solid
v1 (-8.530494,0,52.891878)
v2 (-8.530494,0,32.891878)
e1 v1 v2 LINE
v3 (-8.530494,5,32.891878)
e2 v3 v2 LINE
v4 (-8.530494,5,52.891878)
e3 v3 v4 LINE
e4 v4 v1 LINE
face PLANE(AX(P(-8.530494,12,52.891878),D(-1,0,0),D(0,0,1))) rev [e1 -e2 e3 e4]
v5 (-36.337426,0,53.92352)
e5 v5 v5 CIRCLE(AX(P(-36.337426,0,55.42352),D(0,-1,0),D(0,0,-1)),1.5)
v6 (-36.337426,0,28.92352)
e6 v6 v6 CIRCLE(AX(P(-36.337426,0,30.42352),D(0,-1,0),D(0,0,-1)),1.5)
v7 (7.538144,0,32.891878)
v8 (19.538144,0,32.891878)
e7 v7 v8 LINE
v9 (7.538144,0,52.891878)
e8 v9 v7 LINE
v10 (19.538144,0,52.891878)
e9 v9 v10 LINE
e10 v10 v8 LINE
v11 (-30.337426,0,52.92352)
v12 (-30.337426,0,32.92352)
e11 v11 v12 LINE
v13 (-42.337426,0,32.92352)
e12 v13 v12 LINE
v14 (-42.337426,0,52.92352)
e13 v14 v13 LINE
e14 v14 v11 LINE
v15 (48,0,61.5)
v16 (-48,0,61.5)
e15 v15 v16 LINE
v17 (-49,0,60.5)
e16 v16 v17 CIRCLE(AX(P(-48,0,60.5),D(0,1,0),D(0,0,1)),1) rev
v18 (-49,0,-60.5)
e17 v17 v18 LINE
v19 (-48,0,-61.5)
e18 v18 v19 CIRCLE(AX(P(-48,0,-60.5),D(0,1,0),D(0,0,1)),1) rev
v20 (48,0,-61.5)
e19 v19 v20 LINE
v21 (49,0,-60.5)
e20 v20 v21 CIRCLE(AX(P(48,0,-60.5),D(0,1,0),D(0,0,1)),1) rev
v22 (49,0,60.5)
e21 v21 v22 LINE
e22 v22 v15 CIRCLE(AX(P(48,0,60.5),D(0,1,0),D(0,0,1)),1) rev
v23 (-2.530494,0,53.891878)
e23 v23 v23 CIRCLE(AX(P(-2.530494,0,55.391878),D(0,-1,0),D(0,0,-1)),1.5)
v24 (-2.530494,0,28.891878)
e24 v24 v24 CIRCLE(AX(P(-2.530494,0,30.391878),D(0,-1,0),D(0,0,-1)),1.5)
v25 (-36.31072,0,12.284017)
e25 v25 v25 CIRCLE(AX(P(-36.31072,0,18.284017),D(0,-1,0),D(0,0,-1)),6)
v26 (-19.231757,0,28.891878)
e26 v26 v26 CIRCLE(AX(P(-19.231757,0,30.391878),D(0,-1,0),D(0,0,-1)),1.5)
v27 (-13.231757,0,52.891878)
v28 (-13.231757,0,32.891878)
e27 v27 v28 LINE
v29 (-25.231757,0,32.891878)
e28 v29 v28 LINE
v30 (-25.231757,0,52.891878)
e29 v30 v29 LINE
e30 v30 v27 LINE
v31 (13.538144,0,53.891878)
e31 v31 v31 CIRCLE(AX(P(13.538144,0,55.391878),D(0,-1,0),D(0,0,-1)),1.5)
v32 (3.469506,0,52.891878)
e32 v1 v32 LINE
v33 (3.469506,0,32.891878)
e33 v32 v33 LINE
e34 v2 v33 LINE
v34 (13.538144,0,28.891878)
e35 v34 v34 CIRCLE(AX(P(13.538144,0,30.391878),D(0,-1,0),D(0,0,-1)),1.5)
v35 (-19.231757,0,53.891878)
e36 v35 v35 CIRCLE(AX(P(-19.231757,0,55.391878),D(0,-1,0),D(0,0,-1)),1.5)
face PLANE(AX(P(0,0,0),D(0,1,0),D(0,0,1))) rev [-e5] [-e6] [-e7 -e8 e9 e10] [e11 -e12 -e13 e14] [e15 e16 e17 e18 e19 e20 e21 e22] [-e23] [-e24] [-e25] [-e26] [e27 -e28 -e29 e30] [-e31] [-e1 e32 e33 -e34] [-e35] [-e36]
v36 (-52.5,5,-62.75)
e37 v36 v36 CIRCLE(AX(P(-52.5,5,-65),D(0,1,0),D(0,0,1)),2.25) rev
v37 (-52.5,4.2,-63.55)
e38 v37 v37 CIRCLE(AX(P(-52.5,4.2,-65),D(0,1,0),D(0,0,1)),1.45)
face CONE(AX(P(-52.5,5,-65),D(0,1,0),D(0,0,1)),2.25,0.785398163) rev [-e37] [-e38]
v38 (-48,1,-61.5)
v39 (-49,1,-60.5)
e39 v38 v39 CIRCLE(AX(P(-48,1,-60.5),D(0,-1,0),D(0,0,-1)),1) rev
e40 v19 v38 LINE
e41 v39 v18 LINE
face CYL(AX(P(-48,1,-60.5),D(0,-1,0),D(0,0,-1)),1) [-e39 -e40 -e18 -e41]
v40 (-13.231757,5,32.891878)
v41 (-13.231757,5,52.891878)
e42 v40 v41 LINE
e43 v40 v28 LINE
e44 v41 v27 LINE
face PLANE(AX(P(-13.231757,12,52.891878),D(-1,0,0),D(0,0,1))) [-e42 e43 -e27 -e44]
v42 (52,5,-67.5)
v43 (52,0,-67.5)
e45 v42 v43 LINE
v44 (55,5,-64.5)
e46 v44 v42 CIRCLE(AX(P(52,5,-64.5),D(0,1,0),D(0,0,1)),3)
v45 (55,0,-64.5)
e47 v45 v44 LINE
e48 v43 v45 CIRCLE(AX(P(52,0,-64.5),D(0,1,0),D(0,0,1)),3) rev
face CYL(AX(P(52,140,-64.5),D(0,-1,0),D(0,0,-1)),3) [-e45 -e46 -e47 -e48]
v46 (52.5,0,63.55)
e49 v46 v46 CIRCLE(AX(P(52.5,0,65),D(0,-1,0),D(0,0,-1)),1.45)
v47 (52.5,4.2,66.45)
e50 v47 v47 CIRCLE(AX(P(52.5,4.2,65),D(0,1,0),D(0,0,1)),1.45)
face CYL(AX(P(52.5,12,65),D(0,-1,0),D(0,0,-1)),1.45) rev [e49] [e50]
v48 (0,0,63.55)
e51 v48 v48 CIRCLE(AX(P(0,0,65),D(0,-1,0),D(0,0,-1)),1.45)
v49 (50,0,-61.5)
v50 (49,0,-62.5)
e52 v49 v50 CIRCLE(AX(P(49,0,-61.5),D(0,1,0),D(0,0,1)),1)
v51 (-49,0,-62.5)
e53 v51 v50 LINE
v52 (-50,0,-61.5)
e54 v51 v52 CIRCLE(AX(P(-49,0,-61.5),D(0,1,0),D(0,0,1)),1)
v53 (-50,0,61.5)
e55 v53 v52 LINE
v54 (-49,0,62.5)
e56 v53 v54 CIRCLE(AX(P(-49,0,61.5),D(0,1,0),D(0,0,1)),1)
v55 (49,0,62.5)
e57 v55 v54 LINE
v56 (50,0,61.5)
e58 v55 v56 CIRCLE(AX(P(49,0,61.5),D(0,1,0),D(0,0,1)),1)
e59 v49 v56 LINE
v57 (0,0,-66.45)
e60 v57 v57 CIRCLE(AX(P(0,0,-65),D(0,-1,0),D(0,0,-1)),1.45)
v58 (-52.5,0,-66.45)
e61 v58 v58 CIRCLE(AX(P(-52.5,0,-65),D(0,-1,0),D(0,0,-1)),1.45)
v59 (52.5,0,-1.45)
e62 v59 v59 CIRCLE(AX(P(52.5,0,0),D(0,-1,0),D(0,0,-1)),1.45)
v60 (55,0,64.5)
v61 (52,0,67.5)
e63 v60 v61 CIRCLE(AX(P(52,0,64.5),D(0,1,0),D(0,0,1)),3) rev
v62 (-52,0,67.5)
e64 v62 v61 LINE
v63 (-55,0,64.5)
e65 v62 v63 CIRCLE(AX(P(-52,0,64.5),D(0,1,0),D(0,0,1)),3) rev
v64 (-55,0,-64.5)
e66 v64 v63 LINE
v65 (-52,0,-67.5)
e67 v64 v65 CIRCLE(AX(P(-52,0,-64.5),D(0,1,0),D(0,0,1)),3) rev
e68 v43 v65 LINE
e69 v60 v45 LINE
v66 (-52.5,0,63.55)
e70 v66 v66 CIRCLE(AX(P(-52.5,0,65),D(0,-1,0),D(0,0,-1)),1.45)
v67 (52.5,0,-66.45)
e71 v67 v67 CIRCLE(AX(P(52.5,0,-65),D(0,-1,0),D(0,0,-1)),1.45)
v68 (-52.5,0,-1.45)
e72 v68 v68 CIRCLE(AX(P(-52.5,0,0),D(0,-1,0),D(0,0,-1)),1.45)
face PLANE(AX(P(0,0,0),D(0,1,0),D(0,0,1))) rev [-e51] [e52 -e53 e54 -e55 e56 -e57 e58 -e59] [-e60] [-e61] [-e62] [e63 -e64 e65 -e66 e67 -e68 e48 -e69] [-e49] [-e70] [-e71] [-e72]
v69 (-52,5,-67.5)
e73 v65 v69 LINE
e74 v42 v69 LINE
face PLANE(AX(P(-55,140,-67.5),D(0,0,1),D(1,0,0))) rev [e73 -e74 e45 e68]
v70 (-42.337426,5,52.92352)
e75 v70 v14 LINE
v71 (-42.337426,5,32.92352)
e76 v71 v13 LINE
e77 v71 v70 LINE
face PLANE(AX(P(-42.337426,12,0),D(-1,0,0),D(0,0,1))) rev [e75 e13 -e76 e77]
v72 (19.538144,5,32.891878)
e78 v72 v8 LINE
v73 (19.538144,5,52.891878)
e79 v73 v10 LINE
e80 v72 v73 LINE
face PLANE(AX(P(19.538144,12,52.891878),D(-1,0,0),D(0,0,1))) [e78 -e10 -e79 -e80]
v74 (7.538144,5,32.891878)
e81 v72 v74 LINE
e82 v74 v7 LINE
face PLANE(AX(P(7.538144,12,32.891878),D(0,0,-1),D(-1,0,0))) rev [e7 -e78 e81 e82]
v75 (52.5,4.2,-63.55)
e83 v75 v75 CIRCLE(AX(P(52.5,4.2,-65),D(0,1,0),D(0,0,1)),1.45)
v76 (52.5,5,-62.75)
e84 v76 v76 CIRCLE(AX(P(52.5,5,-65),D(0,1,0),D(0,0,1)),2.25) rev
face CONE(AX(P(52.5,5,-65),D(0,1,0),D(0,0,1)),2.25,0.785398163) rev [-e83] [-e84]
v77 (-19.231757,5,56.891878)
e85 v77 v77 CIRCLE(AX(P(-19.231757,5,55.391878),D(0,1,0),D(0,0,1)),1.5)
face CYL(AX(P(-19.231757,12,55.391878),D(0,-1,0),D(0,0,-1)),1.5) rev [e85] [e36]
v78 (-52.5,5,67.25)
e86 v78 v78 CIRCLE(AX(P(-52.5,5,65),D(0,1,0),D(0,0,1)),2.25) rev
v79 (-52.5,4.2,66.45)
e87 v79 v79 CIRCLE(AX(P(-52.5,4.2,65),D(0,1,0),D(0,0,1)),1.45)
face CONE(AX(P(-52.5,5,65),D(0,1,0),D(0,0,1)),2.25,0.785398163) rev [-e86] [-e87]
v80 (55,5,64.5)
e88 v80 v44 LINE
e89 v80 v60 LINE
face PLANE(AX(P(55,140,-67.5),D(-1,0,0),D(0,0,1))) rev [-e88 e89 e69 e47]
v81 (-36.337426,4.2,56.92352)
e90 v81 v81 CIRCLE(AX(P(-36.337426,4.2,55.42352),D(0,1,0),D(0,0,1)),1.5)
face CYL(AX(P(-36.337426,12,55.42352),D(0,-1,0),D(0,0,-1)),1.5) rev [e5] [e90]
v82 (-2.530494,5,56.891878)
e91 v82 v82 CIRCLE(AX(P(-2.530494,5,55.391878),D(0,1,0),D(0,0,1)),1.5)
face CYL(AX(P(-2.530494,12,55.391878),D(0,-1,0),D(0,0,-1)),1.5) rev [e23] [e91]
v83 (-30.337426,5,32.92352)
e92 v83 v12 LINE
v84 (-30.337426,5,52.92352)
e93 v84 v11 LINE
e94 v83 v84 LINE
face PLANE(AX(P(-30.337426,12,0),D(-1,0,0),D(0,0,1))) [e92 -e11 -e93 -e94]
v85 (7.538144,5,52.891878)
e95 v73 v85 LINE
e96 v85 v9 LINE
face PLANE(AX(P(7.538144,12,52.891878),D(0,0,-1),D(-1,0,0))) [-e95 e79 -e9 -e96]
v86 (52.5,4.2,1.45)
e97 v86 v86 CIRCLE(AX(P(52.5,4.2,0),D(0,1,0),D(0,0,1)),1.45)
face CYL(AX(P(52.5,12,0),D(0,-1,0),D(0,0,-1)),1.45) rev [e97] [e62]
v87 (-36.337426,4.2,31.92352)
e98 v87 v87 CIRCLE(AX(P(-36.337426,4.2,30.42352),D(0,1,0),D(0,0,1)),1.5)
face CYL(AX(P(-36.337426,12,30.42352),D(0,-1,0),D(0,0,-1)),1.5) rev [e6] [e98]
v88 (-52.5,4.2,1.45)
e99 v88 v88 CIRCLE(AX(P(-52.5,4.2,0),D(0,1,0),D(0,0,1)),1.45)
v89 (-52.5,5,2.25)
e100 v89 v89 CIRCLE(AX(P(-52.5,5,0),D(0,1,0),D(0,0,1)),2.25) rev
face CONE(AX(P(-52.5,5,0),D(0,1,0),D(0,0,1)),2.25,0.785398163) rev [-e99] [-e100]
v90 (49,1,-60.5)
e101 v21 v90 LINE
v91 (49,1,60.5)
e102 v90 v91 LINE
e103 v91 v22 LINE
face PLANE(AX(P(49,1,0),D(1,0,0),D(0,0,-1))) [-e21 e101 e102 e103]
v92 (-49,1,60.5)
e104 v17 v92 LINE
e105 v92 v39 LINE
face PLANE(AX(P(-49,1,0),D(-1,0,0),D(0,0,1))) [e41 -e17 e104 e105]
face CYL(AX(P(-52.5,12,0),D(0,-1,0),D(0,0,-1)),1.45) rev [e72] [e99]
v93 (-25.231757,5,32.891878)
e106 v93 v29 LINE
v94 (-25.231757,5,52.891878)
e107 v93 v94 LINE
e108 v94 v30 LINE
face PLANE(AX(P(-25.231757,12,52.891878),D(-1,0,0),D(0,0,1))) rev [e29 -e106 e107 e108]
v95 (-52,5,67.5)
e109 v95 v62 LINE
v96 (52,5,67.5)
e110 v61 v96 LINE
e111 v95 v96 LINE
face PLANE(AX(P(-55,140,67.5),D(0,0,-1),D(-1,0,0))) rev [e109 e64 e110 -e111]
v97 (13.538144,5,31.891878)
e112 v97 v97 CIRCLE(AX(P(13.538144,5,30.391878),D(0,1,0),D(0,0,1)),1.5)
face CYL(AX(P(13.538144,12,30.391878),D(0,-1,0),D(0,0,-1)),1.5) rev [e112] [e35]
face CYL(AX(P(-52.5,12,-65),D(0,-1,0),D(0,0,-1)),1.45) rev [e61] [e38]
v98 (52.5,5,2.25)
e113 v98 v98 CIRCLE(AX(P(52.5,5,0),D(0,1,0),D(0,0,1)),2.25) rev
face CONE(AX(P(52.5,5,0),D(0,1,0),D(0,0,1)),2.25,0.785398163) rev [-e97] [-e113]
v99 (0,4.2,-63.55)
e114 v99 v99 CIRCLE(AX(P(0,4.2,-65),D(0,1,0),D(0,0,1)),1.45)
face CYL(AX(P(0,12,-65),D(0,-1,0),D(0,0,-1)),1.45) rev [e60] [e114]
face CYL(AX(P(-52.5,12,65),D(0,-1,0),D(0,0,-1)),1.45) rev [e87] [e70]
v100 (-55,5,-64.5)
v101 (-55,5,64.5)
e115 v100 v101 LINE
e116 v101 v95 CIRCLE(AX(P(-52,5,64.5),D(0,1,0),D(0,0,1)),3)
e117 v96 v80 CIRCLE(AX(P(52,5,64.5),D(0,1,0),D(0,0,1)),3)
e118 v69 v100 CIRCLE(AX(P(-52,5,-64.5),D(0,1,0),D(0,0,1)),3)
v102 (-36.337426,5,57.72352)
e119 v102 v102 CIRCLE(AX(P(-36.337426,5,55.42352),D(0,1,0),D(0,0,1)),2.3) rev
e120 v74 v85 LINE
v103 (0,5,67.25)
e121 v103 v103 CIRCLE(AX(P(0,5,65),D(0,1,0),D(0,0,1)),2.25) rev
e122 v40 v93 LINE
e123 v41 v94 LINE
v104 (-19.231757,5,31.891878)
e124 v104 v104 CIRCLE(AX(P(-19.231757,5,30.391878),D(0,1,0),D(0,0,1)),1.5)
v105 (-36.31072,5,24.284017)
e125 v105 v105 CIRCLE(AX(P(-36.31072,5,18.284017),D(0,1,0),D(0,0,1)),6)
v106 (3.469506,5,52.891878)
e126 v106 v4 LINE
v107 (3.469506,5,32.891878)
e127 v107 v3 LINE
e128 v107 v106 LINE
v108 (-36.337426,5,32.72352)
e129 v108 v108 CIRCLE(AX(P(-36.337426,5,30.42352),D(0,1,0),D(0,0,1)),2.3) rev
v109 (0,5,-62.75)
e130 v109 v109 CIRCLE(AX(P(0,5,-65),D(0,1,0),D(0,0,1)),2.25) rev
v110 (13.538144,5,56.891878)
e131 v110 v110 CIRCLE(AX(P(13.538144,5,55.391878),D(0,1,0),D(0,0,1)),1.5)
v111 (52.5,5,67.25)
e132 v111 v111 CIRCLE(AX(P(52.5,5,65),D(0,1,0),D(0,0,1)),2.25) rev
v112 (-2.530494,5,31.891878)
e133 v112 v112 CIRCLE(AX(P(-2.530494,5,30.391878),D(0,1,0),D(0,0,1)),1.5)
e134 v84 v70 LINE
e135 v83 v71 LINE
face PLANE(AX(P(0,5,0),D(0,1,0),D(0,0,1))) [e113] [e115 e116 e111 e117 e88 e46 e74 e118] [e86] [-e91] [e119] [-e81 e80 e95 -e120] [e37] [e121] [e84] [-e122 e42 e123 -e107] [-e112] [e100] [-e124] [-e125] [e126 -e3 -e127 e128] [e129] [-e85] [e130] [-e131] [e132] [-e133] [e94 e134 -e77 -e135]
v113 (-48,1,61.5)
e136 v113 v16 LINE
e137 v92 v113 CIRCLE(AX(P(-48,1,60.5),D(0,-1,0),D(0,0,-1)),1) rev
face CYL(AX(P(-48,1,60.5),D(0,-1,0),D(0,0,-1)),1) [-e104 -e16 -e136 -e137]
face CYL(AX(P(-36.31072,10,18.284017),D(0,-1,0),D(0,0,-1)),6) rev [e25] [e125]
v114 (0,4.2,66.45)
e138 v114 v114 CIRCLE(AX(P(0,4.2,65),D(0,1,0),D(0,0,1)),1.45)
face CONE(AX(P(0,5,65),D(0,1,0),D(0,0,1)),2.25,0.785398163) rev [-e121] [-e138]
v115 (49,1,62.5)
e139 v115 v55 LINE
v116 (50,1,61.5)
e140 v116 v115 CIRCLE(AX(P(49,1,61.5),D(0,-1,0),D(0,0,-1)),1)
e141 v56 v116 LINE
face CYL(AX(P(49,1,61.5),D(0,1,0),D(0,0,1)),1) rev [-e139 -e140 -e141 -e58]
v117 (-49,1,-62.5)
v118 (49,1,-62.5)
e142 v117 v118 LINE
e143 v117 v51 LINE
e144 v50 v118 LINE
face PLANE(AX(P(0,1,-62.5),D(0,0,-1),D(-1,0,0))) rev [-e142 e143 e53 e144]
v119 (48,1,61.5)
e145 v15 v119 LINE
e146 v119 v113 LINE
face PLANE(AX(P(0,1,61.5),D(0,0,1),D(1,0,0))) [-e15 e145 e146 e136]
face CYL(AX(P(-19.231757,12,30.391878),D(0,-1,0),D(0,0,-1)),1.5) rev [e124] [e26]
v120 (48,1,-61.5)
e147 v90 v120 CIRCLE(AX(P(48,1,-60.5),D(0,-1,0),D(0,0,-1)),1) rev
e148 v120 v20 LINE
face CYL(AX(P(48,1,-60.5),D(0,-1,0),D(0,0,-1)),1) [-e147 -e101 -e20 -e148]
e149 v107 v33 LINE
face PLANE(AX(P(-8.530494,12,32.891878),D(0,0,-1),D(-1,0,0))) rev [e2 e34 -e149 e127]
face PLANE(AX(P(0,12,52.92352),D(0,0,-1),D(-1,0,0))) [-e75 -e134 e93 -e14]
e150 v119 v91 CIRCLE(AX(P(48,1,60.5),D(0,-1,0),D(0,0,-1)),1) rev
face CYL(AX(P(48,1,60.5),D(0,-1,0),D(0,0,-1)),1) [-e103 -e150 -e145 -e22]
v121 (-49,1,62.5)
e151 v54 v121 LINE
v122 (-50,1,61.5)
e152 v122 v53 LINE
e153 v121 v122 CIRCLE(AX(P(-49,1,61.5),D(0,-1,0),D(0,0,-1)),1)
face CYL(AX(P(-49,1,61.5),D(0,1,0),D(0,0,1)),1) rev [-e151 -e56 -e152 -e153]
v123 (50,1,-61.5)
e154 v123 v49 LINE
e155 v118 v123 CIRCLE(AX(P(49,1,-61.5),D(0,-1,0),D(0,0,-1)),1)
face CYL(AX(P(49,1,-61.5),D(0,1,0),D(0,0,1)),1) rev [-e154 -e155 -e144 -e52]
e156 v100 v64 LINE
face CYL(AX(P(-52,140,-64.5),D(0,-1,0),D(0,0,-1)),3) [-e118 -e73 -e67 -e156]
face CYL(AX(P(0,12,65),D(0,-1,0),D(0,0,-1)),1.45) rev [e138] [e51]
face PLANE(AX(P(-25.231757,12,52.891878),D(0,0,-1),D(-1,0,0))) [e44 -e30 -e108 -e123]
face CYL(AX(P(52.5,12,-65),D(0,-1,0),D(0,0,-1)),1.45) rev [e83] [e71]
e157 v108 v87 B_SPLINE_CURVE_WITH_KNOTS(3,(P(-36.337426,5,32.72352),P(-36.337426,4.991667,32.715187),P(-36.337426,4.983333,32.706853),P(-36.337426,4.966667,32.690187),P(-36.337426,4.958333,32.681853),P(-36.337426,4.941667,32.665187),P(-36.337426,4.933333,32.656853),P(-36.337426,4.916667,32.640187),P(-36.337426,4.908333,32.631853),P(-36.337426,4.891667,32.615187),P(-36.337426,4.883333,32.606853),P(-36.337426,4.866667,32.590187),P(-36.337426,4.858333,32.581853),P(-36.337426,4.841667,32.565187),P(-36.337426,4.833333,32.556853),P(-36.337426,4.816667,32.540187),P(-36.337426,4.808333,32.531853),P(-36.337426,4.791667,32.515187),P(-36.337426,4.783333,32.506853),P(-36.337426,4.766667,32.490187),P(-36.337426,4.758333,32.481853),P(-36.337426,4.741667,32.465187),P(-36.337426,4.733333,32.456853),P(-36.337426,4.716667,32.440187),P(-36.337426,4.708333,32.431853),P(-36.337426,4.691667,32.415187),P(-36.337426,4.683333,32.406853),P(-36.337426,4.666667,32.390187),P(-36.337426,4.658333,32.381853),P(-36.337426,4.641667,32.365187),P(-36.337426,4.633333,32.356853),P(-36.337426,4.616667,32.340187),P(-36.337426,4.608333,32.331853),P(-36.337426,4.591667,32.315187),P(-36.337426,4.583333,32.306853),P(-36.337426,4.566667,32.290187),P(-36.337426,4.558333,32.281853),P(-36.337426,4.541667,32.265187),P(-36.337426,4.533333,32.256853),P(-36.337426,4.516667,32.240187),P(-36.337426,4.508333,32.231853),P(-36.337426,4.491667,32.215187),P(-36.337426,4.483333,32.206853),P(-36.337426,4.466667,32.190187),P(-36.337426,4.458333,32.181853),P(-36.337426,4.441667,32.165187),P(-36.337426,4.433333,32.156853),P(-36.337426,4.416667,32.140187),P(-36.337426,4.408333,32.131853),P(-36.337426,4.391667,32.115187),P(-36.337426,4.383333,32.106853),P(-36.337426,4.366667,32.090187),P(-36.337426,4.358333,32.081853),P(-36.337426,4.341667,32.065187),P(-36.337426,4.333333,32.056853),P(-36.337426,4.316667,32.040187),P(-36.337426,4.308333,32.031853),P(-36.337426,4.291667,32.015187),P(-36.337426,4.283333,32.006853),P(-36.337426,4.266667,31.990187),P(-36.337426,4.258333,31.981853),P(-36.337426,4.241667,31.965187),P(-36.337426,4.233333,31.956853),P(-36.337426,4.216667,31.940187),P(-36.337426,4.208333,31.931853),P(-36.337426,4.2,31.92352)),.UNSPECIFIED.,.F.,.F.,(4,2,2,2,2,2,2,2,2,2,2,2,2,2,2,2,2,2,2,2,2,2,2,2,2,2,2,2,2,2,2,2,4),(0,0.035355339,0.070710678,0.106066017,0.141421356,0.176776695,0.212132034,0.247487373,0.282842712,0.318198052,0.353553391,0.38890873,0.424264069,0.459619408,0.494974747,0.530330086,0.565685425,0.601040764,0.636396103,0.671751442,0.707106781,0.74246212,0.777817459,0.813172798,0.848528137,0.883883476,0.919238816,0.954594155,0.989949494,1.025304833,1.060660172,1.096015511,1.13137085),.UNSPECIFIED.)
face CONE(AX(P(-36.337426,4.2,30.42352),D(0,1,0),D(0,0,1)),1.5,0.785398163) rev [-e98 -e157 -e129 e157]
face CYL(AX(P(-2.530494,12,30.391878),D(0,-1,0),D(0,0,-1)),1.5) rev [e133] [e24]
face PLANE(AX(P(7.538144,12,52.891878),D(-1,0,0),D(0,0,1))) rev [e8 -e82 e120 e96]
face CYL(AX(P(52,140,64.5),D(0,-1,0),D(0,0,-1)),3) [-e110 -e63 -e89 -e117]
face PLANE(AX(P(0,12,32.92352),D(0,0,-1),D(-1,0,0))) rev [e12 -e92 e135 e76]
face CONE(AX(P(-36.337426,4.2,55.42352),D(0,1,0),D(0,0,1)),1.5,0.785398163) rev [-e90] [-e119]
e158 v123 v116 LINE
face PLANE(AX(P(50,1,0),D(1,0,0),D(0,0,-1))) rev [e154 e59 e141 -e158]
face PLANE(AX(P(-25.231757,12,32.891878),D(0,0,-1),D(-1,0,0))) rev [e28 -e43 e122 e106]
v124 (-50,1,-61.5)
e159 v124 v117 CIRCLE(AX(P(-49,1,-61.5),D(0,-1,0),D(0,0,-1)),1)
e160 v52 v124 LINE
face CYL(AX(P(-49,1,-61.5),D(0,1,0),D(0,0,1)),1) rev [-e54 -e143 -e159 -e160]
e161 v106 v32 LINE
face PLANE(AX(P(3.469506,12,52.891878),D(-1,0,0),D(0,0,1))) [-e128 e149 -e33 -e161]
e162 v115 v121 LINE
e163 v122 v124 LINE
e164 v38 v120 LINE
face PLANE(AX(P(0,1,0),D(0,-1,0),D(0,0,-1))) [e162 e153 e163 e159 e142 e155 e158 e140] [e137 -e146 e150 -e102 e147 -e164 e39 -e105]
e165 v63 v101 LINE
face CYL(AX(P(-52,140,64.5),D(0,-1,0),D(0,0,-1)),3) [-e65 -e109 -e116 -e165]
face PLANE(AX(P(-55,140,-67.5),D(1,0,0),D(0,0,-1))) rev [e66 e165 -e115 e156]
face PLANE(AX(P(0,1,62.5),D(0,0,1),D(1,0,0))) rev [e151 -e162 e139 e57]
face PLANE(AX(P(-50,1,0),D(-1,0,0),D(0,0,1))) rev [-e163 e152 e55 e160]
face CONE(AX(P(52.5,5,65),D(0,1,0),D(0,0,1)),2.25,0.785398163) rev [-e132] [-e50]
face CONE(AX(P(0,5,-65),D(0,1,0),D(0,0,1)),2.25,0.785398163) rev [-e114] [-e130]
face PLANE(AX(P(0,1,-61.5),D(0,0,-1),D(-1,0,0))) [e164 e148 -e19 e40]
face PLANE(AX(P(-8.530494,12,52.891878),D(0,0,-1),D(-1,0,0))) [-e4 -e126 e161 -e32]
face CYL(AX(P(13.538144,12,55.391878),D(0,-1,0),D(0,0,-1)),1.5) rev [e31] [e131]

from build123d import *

# Parameters (mm, degrees)
SKETCH1_W           = 110
SKETCH1_H           = 135
SKETCH1_W_2         = 100
SKETCH1_H_2         = 125
BOSS_EXTRUDE1_DEPTH = 140
SKETCH2_W           = 110
SKETCH2_H           = 135
BOSS_EXTRUDE2_DEPTH = 5
SKETCH3_R           = 1.45
CUT_EXTRUDE1_DEPTH  = 12
SKETCH4_W           = 110
SKETCH4_H           = 135
CUT_EXTRUDE2_DEPTH  = 140
SKETCH6_W           = 100
SKETCH6_H           = 125
BOSS_EXTRUDE3_DEPTH = 5
FILLET1_R           = 3
SKETCH7_W           = 100
SKETCH7_H           = 125
SKETCH7_W_2         = 98
SKETCH7_H_2         = 123
CUT_EXTRUDE3_DEPTH  = 1
FILLET2_R           = 1
SKETCH8_W           = 12
SKETCH8_H           = 20
SKETCH8_R           = 1.5
CUT_EXTRUDE4_DEPTH  = 12
SKETCH9_R           = 6
CUT_EXTRUDE5_DEPTH  = 10
CHAMFER1_SIZE       = 0.8


with BuildPart() as part:
    # Sketch1 → Boss-Extrude1 (new body)
    with BuildSketch(Plane(origin=(0, 0, 0), x_dir=(1, 0, 0), z_dir=(0, 1, 0))):
        Rectangle(SKETCH1_W, SKETCH1_H)
        Rectangle(SKETCH1_W_2, SKETCH1_H_2, mode=Mode.SUBTRACT)
    extrude(amount=BOSS_EXTRUDE1_DEPTH)

    # Sketch2 → Boss-Extrude2 (add)
    with BuildSketch(Plane(origin=(0, 140, 0), x_dir=(1, 0, 0), z_dir=(0, 1, 0))):
        Rectangle(SKETCH2_W, SKETCH2_H)
    extrude(amount=BOSS_EXTRUDE2_DEPTH)

    # Sketch3 → Cut-Extrude1 (cut)
    with BuildSketch(Plane.XZ):
        with Locations((-52.5, 65)):
            Circle(SKETCH3_R)
        with Locations((0, 65)):
            Circle(SKETCH3_R)
        with Locations((-52.5, 0)):
            Circle(SKETCH3_R)
        with Locations((52.5, 65)):
            Circle(SKETCH3_R)
        with Locations((-52.5, -65)):
            Circle(SKETCH3_R)
        with Locations((52.5, 0)):
            Circle(SKETCH3_R)
        with Locations((0, -65)):
            Circle(SKETCH3_R)
        with Locations((52.5, -65)):
            Circle(SKETCH3_R)
    extrude(amount=-CUT_EXTRUDE1_DEPTH, mode=Mode.SUBTRACT)

    # Sketch4 → Cut-Extrude2 (cut)
    with BuildSketch(Plane(origin=(0, 145, 0), x_dir=(1, 0, 0), z_dir=(0, 1, 0))):
        Rectangle(SKETCH4_W, SKETCH4_H)
    extrude(amount=-CUT_EXTRUDE2_DEPTH, mode=Mode.SUBTRACT)

    # Sketch6 → Boss-Extrude3 (add)
    with BuildSketch(Plane.XZ):
        Rectangle(SKETCH6_W, SKETCH6_H)
    extrude(amount=-BOSS_EXTRUDE3_DEPTH)

    # Fillet1
    fillet1_edges = [part.edges().sort_by_distance(p)[0] for p in [
        (-55, 2.5, 67.5),
        (-55, 2.5, -67.5),
        (55, 2.5, -67.5),
        (55, 2.5, 67.5),
    ]]
    fillet(fillet1_edges, radius=FILLET1_R)

    # Sketch7 → Cut-Extrude3 (cut)
    with BuildSketch(Plane.XZ):
        Rectangle(SKETCH7_W, SKETCH7_H)
        Rectangle(SKETCH7_W_2, SKETCH7_H_2, mode=Mode.SUBTRACT)
    extrude(amount=-CUT_EXTRUDE3_DEPTH, mode=Mode.SUBTRACT)

    # Fillet2
    fillet2_edges = [part.edges().sort_by_distance(p)[0] for p in [
        (-50, 0.5, 62.5),
        (-49, 0.5, 61.5),
        (-49, 0.5, -61.5),
        (-50, 0.5, -62.5),
        (50, 0.5, -62.5),
        (49, 0.5, -61.5),
        (50, 0.5, 62.5),
        (49, 0.5, 61.5),
    ]]
    fillet(fillet2_edges, radius=FILLET2_R)

    # Sketch8 → Cut-Extrude4 (cut)
    with BuildSketch(Plane.XZ):
        with Locations((-2.530494279, 42.89187803)):
            Rectangle(SKETCH8_W, SKETCH8_H)
        with Locations((-19.231756521, 42.89187803)):
            Rectangle(SKETCH8_W, SKETCH8_H)
        with Locations((-36.337425876, 42.923519988)):
            Rectangle(SKETCH8_W, SKETCH8_H)
        with Locations((13.538144393, 42.89187803)):
            Rectangle(SKETCH8_W, SKETCH8_H)
        with Locations((-36.337425876, 55.423519988)):
            Circle(SKETCH8_R)
        with Locations((-36.337425876, 30.423519988)):
            Circle(SKETCH8_R)
        with Locations((-19.231756521, 55.39187803)):
            Circle(SKETCH8_R)
        with Locations((-19.231756521, 30.39187803)):
            Circle(SKETCH8_R)
        with Locations((-2.530494279, 55.39187803)):
            Circle(SKETCH8_R)
        with Locations((-2.530494279, 30.39187803)):
            Circle(SKETCH8_R)
        with Locations((13.538144393, 55.39187803)):
            Circle(SKETCH8_R)
        with Locations((13.538144393, 30.39187803)):
            Circle(SKETCH8_R)
    extrude(amount=-CUT_EXTRUDE4_DEPTH, mode=Mode.SUBTRACT)

    # Sketch9 → Cut-Extrude5 (cut)
    with BuildSketch(Plane.XZ):
        with Locations((-36.310720447, 18.284017074)):
            Circle(SKETCH9_R)
    extrude(amount=-CUT_EXTRUDE5_DEPTH, mode=Mode.SUBTRACT)

    # Chamfer1
    chamfer1_edges = [part.edges().sort_by_distance(p)[0] for p in [
        (-37.837425876, 5, 30.423519988),
        (-37.837425876, 5, 55.423519988),
        (-53.95, 5, -65),
        (-1.45, 5, -65),
        (51.05, 5, -65),
        (51.05, 5, 0),
        (51.05, 5, 65),
        (-1.45, 5, 65),
        (-53.95, 5, 65),
        (-53.95, 5, 0),
    ]]
    chamfer(chamfer1_edges, length=CHAMFER1_SIZE)


solid = part.part
